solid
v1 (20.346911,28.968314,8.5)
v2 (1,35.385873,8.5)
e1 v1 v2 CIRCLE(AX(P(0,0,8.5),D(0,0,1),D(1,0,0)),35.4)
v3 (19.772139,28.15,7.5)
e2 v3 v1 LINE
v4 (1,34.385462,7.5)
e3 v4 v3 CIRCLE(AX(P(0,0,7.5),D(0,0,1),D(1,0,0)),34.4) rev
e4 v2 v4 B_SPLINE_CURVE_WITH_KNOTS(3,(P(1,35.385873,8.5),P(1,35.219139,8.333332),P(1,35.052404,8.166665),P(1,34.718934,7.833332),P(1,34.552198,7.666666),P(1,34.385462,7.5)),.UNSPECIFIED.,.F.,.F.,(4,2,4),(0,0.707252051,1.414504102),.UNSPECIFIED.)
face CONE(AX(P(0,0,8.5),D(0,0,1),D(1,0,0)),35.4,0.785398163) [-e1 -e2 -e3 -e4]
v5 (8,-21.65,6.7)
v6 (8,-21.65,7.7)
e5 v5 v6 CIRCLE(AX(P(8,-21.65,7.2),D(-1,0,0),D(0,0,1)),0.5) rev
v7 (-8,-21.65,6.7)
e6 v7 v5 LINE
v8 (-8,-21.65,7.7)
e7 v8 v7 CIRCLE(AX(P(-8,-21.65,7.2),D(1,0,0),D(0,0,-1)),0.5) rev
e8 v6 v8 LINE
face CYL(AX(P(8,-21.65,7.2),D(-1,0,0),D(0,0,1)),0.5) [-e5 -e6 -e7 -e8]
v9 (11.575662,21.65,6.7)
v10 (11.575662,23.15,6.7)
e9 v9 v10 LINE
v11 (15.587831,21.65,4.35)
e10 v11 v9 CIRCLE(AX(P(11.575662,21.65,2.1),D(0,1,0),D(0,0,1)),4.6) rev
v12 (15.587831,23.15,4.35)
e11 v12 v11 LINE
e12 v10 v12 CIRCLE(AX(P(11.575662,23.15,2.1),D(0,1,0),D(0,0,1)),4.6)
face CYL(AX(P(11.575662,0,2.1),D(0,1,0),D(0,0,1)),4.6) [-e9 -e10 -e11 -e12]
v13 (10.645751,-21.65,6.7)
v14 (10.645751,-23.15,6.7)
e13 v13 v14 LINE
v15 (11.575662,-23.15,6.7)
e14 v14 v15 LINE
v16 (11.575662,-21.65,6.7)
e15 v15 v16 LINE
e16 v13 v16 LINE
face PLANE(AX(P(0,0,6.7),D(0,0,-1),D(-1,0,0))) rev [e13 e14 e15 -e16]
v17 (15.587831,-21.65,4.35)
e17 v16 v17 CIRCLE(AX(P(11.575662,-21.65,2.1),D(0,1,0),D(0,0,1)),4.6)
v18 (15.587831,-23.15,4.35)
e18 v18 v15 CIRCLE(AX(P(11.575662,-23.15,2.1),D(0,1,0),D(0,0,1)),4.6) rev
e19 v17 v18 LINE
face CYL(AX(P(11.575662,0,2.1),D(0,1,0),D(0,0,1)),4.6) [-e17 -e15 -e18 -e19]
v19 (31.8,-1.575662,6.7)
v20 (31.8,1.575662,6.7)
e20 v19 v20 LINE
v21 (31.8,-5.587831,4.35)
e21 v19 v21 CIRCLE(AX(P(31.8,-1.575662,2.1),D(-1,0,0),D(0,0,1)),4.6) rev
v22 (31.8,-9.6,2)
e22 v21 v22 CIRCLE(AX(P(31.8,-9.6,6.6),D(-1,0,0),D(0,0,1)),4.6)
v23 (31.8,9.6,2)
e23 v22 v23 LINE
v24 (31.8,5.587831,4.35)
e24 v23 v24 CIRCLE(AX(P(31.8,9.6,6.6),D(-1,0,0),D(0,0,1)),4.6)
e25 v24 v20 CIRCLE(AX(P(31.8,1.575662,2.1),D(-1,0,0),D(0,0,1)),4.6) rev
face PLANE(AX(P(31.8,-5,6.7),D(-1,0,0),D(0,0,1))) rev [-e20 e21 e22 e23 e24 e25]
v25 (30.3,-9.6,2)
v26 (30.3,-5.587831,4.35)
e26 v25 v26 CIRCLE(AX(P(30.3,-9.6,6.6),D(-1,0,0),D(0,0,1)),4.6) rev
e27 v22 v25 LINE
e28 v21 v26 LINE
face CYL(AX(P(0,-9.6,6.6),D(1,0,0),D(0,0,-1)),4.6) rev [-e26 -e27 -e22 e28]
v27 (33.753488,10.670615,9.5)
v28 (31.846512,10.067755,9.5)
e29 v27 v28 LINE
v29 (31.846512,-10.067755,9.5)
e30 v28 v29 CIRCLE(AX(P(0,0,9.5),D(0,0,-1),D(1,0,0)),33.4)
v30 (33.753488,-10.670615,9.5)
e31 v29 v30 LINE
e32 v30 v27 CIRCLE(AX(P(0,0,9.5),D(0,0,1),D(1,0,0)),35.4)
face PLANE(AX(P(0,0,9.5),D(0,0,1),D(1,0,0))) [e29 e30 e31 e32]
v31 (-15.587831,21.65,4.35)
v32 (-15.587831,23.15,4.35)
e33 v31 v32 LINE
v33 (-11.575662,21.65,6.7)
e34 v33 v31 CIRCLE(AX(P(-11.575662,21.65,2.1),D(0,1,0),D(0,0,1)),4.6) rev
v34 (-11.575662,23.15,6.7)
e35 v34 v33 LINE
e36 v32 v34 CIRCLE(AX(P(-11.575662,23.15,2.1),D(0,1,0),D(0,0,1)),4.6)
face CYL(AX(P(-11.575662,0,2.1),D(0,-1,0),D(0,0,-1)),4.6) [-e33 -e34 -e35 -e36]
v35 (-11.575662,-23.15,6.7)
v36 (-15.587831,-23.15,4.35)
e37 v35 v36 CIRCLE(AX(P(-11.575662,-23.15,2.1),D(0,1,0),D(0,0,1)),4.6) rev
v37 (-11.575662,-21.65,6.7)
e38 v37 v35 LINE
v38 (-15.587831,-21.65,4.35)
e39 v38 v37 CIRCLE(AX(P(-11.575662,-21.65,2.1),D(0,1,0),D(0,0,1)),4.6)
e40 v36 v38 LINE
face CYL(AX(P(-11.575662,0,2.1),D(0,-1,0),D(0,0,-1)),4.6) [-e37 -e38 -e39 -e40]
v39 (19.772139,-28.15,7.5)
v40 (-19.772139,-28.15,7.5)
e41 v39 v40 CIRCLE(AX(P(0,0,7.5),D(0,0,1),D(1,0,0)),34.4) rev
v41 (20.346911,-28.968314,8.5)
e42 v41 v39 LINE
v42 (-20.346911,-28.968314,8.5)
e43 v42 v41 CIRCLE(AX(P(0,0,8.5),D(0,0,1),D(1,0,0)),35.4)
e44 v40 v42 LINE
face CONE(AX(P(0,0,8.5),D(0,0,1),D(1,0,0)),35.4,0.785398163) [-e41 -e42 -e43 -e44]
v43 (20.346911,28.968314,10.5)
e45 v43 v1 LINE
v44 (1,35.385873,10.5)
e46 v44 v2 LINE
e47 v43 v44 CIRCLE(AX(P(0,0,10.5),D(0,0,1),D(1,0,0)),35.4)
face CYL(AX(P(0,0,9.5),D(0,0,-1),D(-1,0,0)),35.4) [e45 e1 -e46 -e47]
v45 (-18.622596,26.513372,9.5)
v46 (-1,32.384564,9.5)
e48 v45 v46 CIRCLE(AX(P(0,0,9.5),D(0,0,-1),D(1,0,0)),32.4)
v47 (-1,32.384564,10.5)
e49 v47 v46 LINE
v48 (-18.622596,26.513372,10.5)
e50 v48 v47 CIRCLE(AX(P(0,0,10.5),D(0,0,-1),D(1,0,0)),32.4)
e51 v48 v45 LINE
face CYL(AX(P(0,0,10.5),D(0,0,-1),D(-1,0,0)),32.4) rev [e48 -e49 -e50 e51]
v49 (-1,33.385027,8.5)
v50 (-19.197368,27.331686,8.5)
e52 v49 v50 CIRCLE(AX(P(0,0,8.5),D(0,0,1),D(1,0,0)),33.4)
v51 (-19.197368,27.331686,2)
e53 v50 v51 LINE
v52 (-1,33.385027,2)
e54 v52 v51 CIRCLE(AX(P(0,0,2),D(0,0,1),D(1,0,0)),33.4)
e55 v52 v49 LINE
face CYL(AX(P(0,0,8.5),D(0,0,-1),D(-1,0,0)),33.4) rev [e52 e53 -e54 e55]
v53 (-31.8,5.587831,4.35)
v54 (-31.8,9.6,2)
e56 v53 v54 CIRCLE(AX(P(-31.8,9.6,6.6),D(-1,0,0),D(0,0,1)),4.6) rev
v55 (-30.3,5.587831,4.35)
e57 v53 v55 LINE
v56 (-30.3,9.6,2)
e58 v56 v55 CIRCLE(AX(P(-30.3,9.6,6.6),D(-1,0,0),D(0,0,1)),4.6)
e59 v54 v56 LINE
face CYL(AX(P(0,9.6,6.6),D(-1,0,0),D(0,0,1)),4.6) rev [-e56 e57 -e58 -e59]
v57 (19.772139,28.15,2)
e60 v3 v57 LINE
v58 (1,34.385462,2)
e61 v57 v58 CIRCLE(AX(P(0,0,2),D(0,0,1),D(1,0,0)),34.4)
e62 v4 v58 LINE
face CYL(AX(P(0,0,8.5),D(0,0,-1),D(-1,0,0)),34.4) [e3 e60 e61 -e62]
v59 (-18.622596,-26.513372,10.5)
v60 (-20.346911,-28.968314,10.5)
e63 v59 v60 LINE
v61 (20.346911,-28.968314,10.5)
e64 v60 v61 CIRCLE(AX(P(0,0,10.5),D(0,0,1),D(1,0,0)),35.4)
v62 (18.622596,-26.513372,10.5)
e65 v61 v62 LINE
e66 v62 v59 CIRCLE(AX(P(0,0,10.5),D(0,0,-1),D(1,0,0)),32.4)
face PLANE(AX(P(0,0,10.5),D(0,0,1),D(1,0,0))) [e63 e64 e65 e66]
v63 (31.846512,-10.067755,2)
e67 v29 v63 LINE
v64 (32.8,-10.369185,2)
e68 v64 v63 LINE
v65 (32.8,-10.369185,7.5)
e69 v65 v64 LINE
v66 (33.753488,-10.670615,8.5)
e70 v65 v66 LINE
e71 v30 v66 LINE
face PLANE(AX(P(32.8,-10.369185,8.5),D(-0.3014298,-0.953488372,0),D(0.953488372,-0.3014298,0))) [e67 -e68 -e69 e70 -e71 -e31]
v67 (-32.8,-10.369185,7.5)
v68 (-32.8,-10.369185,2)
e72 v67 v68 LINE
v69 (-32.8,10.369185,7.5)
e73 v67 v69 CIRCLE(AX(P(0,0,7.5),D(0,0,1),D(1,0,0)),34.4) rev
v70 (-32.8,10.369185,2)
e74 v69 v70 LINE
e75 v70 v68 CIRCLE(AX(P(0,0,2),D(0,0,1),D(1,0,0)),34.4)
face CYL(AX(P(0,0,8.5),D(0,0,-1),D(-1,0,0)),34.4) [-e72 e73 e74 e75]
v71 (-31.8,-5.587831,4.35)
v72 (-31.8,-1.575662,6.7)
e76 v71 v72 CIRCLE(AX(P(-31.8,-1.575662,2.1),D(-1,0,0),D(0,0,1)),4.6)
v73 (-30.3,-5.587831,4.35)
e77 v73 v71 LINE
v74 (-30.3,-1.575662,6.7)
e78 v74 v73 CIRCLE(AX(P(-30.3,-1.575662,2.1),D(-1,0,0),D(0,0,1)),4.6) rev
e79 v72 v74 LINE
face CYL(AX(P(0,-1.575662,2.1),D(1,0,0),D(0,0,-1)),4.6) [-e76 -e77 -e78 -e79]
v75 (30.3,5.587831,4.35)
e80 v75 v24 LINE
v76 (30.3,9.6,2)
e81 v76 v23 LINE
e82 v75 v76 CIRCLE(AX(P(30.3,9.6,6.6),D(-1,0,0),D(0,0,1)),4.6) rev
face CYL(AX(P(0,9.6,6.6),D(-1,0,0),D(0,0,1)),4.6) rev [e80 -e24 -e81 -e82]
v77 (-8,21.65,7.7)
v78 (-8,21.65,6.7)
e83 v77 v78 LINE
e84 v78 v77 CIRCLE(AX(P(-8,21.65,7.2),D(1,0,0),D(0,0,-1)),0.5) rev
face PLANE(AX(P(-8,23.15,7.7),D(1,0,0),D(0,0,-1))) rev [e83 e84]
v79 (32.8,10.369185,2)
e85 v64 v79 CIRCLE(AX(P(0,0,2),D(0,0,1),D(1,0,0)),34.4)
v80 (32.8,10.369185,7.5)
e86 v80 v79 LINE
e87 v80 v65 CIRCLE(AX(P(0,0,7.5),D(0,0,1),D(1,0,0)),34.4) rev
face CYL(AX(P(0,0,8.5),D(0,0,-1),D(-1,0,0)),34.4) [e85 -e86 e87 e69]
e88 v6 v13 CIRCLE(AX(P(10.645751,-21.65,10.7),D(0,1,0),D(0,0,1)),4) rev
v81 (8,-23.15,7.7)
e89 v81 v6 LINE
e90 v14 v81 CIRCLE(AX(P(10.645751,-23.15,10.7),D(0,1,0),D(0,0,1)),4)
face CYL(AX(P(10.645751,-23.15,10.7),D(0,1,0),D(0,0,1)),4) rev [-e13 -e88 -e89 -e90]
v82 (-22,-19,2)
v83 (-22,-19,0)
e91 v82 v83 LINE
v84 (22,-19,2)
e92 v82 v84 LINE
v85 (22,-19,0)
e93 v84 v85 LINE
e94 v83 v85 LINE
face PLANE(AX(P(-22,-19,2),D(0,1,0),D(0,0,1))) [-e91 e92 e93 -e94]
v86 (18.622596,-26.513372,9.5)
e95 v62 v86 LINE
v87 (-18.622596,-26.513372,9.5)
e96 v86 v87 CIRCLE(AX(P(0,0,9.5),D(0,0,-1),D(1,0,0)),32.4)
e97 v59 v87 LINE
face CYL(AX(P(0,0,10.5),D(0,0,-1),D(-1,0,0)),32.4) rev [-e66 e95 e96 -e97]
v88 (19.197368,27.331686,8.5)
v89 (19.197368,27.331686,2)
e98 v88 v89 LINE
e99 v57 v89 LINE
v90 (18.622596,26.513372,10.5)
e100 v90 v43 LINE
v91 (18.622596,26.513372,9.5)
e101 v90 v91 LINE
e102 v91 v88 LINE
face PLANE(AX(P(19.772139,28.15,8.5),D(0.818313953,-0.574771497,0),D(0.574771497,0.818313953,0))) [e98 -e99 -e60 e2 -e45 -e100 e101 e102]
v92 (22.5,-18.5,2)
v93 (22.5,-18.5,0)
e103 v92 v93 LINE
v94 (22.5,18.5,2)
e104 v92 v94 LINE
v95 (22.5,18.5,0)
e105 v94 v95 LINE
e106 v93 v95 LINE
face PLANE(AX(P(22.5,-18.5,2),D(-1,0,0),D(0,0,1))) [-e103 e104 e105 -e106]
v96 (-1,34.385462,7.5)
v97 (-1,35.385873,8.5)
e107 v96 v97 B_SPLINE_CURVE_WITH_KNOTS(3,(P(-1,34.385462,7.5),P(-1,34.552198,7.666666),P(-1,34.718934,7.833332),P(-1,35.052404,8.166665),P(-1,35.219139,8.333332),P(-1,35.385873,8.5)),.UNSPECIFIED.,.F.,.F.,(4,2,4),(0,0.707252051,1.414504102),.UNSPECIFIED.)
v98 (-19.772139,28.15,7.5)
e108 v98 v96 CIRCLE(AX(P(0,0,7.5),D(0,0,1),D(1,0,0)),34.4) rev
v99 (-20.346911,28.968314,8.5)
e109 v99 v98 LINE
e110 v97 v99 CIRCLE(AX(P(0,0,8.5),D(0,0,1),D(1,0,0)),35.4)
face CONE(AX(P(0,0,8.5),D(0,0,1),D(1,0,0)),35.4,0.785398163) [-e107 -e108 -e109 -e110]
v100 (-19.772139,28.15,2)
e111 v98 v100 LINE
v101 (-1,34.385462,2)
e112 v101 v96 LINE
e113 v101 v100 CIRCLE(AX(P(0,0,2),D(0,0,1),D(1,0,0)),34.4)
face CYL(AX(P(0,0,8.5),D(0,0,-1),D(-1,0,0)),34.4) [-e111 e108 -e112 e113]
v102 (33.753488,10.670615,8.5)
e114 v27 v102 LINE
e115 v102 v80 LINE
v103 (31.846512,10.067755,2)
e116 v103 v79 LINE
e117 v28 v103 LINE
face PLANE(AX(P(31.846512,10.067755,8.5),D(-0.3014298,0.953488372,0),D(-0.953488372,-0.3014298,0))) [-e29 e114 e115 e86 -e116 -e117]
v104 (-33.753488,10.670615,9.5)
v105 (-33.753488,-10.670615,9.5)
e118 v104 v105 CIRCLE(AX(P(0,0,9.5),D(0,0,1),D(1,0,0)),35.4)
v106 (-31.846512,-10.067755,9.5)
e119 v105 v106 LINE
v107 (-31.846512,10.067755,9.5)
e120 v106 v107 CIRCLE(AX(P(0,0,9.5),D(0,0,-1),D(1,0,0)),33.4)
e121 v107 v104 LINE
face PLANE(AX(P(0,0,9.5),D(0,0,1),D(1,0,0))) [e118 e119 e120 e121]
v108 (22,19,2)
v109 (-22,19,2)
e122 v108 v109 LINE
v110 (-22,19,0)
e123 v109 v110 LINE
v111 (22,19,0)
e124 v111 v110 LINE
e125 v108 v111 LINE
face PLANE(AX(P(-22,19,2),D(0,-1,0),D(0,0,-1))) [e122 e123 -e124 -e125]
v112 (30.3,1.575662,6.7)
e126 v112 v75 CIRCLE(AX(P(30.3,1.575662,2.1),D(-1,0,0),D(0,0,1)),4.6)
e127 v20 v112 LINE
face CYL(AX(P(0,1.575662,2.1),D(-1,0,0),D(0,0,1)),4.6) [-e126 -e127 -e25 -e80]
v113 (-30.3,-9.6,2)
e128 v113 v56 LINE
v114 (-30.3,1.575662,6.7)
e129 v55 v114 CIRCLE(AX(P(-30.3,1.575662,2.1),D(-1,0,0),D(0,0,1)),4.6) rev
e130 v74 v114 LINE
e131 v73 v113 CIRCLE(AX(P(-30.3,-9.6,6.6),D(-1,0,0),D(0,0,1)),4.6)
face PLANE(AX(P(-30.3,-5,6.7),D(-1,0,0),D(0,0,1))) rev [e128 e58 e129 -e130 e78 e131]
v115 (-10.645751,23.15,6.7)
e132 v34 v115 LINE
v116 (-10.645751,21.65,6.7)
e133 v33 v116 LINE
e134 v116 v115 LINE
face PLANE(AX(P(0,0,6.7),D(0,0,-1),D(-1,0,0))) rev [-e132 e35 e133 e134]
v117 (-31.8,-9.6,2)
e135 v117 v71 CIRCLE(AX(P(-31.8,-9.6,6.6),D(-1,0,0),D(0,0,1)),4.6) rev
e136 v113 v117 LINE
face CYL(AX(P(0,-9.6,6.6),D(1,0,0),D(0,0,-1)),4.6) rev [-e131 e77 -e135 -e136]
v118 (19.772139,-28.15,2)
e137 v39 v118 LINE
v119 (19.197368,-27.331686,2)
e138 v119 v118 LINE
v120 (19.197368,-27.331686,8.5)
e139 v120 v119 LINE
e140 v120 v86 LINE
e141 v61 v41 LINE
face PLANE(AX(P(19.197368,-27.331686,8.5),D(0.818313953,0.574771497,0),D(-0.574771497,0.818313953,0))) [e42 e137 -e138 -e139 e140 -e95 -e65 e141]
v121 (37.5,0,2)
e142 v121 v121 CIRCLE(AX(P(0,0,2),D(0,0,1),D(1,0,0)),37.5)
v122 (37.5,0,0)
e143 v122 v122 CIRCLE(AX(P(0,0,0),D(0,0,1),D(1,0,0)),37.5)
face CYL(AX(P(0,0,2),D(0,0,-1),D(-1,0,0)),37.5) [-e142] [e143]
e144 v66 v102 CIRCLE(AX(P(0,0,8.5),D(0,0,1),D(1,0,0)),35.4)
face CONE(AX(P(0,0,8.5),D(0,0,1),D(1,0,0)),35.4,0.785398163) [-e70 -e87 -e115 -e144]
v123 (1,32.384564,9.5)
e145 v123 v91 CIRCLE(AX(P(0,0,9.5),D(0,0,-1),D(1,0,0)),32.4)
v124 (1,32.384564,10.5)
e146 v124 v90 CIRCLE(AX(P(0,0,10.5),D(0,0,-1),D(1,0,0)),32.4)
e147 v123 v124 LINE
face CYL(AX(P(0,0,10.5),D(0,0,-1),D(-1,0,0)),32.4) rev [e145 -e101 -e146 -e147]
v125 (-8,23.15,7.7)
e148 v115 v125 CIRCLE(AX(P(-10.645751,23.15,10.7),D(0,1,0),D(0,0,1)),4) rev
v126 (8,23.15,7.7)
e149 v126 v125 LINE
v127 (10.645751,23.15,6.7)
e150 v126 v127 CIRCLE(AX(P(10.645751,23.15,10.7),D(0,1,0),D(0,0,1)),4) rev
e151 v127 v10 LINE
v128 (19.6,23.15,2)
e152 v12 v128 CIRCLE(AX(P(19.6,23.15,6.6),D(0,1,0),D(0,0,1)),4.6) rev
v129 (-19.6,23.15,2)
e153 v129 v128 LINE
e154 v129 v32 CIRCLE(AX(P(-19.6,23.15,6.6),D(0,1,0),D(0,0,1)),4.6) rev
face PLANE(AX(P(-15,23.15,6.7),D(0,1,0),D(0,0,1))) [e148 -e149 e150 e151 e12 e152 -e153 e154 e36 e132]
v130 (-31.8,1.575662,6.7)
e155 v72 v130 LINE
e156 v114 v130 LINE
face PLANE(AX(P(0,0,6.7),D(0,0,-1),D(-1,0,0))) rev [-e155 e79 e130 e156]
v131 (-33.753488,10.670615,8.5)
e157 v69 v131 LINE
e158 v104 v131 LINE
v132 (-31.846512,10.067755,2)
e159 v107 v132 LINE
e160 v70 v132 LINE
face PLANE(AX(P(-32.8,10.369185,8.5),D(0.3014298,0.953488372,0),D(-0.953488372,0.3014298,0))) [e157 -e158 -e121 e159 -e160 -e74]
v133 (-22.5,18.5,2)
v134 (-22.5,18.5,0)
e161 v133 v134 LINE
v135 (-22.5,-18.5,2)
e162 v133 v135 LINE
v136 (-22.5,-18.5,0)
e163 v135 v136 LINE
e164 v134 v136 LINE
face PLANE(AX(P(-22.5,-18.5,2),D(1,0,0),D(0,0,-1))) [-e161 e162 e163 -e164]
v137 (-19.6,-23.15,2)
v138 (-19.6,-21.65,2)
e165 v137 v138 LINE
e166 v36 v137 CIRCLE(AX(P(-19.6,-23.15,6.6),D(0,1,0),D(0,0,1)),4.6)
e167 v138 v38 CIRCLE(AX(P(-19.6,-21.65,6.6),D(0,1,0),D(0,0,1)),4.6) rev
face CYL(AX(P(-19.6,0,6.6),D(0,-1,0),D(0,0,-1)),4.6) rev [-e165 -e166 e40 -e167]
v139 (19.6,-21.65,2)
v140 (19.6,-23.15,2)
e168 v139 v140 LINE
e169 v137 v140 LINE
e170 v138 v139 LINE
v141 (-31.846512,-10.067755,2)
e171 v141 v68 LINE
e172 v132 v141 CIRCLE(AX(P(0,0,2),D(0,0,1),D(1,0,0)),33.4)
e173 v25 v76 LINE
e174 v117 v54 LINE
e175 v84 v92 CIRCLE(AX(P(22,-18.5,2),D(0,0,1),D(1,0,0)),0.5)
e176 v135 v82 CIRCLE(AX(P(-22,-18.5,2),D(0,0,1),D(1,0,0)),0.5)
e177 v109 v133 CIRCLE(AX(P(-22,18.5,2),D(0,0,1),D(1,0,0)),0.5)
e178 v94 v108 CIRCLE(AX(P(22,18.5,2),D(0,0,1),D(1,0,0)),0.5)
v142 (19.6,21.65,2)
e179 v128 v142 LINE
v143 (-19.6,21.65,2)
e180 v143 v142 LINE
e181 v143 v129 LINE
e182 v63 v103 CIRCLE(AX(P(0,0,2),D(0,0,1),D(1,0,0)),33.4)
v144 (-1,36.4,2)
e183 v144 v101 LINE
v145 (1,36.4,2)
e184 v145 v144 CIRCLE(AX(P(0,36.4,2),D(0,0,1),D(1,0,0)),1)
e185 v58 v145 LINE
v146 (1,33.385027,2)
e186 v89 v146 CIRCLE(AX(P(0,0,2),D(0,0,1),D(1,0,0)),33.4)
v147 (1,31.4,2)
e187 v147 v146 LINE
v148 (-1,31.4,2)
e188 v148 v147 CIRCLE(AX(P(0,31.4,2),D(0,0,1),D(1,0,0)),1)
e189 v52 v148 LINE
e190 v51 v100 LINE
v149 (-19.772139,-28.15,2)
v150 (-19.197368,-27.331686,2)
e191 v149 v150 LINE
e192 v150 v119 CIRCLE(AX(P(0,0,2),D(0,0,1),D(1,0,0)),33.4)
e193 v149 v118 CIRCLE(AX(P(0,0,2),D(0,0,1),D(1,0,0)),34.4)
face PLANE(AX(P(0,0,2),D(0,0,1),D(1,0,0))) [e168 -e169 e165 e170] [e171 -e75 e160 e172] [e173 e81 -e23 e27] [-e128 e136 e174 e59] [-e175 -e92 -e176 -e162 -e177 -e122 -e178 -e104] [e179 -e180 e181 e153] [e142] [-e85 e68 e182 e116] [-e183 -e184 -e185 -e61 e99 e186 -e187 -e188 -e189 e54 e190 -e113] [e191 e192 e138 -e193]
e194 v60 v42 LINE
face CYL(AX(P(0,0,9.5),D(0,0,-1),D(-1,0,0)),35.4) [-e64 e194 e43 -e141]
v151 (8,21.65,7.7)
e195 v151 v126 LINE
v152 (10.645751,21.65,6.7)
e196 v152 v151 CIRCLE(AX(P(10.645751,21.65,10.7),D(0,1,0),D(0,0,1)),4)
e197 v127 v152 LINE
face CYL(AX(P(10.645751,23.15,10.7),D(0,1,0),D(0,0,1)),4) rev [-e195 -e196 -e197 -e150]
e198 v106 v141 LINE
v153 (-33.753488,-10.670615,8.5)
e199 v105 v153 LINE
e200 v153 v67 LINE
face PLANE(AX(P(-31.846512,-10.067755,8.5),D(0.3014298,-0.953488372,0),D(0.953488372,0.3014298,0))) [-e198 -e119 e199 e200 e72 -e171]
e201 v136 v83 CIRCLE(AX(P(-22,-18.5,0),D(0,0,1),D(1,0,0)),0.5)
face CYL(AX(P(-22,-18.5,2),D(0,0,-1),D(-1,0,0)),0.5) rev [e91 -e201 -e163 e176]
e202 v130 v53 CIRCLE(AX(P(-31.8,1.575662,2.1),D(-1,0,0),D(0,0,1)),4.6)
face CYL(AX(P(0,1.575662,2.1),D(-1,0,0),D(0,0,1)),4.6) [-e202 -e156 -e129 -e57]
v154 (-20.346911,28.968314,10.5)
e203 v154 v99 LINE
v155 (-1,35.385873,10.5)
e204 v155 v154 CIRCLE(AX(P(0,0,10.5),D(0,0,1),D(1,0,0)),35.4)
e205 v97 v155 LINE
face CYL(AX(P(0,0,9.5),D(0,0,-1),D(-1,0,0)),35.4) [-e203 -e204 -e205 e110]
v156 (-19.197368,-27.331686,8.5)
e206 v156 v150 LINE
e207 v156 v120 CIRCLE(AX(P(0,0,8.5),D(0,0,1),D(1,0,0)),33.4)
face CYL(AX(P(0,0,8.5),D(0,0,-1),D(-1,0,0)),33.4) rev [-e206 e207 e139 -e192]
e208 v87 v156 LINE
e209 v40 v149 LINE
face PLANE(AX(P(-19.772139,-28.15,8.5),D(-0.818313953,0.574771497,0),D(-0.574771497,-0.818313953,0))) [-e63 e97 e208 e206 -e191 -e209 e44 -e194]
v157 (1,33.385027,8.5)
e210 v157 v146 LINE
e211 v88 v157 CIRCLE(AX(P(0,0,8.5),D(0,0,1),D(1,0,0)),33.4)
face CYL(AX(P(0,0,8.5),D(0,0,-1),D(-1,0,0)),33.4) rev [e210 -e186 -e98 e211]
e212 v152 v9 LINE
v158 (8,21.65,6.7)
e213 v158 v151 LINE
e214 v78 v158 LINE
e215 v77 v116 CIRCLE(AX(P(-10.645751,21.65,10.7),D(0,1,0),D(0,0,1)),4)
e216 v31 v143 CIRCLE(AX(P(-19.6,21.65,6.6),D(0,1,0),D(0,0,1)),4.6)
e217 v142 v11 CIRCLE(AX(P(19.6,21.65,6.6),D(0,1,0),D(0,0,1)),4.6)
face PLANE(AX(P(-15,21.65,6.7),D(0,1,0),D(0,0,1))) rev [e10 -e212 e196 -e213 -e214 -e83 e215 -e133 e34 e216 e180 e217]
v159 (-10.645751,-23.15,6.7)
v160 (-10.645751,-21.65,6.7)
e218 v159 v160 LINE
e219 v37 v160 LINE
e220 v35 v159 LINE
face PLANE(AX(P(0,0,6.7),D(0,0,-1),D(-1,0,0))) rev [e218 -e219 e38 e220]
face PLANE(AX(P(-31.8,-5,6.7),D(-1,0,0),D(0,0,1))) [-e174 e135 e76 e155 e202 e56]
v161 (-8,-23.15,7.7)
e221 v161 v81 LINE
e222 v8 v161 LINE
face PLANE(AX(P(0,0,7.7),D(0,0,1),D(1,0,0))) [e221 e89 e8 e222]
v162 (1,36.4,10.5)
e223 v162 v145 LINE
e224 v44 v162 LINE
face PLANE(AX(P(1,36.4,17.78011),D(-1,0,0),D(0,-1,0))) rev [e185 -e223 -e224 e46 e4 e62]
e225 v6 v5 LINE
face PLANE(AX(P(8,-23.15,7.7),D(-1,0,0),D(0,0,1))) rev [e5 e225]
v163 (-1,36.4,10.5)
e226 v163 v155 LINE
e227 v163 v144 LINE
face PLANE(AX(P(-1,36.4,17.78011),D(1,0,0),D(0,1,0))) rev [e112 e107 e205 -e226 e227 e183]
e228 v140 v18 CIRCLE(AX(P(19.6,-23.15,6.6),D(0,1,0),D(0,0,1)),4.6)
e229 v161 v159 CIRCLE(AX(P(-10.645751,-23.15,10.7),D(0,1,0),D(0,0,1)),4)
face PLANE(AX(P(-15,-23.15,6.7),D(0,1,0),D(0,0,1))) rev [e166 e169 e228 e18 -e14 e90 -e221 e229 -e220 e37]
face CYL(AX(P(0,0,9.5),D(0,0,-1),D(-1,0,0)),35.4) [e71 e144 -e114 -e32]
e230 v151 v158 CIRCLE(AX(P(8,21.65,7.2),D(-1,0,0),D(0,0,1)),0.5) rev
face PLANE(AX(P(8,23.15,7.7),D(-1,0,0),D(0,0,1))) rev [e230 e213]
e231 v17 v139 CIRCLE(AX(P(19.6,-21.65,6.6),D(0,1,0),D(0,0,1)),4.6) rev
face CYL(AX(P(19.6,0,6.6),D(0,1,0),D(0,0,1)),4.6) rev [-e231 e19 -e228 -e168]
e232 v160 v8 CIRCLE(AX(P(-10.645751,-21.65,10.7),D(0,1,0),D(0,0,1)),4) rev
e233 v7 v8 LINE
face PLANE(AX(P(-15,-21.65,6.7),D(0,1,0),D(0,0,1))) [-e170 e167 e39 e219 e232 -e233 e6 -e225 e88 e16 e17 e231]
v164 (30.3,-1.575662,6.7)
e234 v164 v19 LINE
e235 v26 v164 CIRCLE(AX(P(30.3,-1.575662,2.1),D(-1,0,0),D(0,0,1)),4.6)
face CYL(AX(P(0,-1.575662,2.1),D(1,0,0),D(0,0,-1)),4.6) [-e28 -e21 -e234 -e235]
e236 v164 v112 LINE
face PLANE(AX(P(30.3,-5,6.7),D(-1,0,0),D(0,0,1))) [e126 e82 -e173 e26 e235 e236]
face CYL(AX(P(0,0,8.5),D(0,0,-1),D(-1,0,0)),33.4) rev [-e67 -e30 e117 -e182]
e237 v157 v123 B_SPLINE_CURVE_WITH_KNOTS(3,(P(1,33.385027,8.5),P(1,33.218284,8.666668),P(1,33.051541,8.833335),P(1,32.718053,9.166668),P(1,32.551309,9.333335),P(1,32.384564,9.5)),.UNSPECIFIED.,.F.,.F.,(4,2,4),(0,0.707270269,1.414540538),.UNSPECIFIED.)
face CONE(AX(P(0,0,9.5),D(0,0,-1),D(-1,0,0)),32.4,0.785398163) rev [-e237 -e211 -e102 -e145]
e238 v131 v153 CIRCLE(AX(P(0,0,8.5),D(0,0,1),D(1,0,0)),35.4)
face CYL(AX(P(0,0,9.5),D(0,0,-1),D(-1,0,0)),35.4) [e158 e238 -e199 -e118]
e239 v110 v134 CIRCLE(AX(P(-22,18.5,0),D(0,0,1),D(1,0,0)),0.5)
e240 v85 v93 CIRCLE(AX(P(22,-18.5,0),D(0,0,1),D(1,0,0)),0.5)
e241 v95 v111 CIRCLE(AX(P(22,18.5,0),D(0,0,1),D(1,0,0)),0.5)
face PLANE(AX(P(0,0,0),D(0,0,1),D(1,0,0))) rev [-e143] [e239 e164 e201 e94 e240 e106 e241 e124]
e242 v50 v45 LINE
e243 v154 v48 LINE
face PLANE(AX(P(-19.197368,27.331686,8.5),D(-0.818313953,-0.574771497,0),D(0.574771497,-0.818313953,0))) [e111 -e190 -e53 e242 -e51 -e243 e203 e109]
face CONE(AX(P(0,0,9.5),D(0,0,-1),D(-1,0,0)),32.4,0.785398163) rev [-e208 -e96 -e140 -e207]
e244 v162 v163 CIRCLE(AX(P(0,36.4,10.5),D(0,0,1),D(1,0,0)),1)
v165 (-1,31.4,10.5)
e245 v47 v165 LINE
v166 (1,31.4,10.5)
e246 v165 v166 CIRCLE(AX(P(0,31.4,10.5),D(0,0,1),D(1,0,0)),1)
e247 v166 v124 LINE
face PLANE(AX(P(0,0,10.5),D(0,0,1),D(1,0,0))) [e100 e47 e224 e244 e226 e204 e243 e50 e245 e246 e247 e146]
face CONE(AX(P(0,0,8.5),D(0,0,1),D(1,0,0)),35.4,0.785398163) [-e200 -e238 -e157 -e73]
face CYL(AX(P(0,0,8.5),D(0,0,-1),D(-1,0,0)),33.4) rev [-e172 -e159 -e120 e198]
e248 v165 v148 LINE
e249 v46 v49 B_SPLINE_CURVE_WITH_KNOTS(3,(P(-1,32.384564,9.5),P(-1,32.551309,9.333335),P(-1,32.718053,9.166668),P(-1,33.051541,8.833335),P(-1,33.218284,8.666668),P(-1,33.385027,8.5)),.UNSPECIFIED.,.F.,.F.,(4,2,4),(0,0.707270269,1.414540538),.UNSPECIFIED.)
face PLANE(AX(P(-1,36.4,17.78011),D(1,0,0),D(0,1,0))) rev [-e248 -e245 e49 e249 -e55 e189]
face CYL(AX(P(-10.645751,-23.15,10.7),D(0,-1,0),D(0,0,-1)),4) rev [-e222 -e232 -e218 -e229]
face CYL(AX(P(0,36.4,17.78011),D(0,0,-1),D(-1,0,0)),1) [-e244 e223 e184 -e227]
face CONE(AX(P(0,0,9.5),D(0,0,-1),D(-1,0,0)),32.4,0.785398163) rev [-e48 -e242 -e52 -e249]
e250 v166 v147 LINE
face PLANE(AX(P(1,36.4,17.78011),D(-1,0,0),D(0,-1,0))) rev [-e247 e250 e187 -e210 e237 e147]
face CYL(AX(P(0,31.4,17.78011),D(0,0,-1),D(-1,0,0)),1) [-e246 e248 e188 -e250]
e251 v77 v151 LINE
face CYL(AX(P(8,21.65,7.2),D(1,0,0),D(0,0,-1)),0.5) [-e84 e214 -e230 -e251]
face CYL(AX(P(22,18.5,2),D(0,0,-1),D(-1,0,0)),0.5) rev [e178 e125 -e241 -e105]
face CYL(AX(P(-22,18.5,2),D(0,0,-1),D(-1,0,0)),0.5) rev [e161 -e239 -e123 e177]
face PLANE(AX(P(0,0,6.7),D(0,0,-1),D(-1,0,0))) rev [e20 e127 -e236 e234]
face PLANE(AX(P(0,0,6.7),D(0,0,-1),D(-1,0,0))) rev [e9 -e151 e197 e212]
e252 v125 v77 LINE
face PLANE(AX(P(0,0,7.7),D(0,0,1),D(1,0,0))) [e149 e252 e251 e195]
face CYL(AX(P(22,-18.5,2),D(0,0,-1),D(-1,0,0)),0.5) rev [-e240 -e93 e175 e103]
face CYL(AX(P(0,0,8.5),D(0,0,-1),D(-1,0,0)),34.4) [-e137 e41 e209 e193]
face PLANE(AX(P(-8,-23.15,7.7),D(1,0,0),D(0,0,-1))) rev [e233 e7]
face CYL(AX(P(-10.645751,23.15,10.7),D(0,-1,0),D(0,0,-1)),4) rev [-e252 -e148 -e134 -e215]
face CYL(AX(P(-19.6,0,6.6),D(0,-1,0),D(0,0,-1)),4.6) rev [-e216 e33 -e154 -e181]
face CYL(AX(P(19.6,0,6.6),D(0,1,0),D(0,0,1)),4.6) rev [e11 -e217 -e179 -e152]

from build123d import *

# Parameters (mm, degrees)
ESQUISSE1_R        = 37.50000000000001
BOSS_EXTRU_1_DEPTH = 2
ESQUISSE2_W        = 30.000000000000004
ESQUISSE2_H        = 1.4999999999999964
ESQUISSE2_W_2      = 1.5
ESQUISSE2_H_2      = 10
EXTRU_MINCE1_DEPTH = 4.7
ESQUISSE5_W        = 16
ESQUISSE5_H        = 2.0000000000000036
BOSS_EXTRU_3_DEPTH = 1
CONG_5_R           = 0.5
CONG_6_R           = 0.5
CONG_1_R           = 4.6
CONG_2_R           = 4.6
EXTRU_MINCE2_DEPTH = 6.5
BOSS_EXTRU_2_DEPTH = 1
BOSS_EXTRU_5_DEPTH = 1
BOSS_EXTRU_4_DEPTH = 8.5
CHANFREIN1_SIZE    = 1
CONG_7_R           = 4


# Some blends are built 0.0001 mm under size
with BuildPart() as part:
    # Esquisse1 → Boss.-Extru.1 (new body)
    with BuildSketch(Plane.XY):
        Circle(ESQUISSE1_R)
        with BuildLine():
            Line((-21.999999999999996, -18.999999999999996), (22.000000000000004, -18.999999999999996))
            ThreePointArc((22.000000000000004, -18.999999999999996), (22.353553390593277, -18.85355339059327), (22.500000000000004, -18.499999999999996))
            Line((22.500000000000004, -18.499999999999996), (22.500000000000004, 18.500000000000004))
            ThreePointArc((22.500000000000004, 18.500000000000004), (22.353553390593277, 18.853553390593277), (22.000000000000004, 19.000000000000004))
            Line((22.000000000000004, 19.000000000000004), (-21.999999999999996, 19.000000000000004))
            ThreePointArc((-21.999999999999996, 19.000000000000004), (-22.35355339059327, 18.853553390593277), (-22.499999999999996, 18.500000000000004))
            Line((-22.499999999999996, 18.500000000000004), (-22.499999999999996, -18.499999999999996))
            ThreePointArc((-22.499999999999996, -18.499999999999996), (-22.35355339059327, -18.85355339059327), (-21.999999999999996, -18.999999999999996))
        make_face(mode=Mode.SUBTRACT)
    extrude(amount=BOSS_EXTRU_1_DEPTH)

    # Esquisse2 → Extru.-Mince1 (add)
    with BuildSketch(Plane.XY.offset(2)):
        with Locations((0, 22.4)):
            Rectangle(ESQUISSE2_W, ESQUISSE2_H)
        with Locations((31.05, 0)):
            Rectangle(ESQUISSE2_W_2, ESQUISSE2_H_2)
        with Locations((-31.05, 0)):
            Rectangle(ESQUISSE2_W_2, ESQUISSE2_H_2)
        with Locations((0, -22.4)):
            Rectangle(ESQUISSE2_W, ESQUISSE2_H)
    extrude(amount=EXTRU_MINCE1_DEPTH)

    # Esquisse5 → Boss.-Extru.3 (add)
    with BuildSketch(Plane.XY.offset(6.7)):
        with Locations((0, 22.15)):
            Rectangle(ESQUISSE5_W, ESQUISSE5_H)
        with Locations((0, -22.15)):
            Rectangle(ESQUISSE5_W, ESQUISSE5_H)
    extrude(amount=BOSS_EXTRU_3_DEPTH)

    # Congé5
    # the kernel refuses this fillet: 0.5 mm, written as the material it takes off along each edge
    with BuildSketch(Plane(origin=(9.25, 21.15, 6.7), x_dir=(0, 1, 0), z_dir=(-1, 0, 0))) as cong_5_piece_1:
        with BuildLine():
            CenterArc((CONG_5_R, -CONG_5_R), CONG_5_R, 90, 90)
            Line((0, -CONG_5_R), (0, 0))
            Line((0, 0), (CONG_5_R, 0))
        make_face()
    extrude(amount=18.5, mode=Mode.SUBTRACT)
    with BuildSketch(Plane(origin=(9.25, 21.15, 7.7), x_dir=(0, 0, -1), z_dir=(-1, 0, 0))) as cong_5_piece_2:
        with BuildLine():
            CenterArc((CONG_5_R, -CONG_5_R), CONG_5_R, 90, 90)
            Line((0, -CONG_5_R), (0, 0))
            Line((0, 0), (CONG_5_R, 0))
        make_face()
    extrude(amount=18.5, mode=Mode.SUBTRACT)

    # Congé6
    # the kernel refuses this fillet: 0.5 mm, written as the material it takes off along each edge
    with BuildSketch(Plane(origin=(9.25, -21.15, 6.7), x_dir=(0, -1, 0), z_dir=(-1, 0, 0))) as cong_6_piece_1:
        with BuildLine():
            CenterArc((CONG_6_R, CONG_6_R), CONG_6_R, 180, 90)
            Line((0, CONG_6_R), (0, 0))
            Line((0, 0), (CONG_6_R, 0))
        make_face()
    extrude(amount=18.5, mode=Mode.SUBTRACT)
    with BuildSketch(Plane(origin=(9.25, -21.15, 7.7), x_dir=(0, -1, 0), z_dir=(-1, 0, 0))) as cong_6_piece_2:
        with BuildLine():
            CenterArc((CONG_6_R, -CONG_6_R), CONG_6_R, 90, 90)
            Line((0, -CONG_6_R), (0, 0))
            Line((0, 0), (CONG_6_R, 0))
        make_face()
    extrude(amount=18.5, mode=Mode.SUBTRACT)

    # Congé1
    cong_1_edges = [part.edges().sort_by_distance(p)[0] for p in [
        (-15, 22.4, 2),
        (15, 22.4, 2),
        (31.05, -5, 2),
        (31.05, 5, 2),
        (-31.05, -5, 2),
        (-31.05, 5, 2),
        (-15, -22.4, 2),
        (15, -22.4, 2),
    ]]
    fillet(cong_1_edges, radius=CONG_1_R)

    # Congé2
    cong_2_edges = [part.edges().sort_by_distance(p)[0] for p in [
        (15, 22.4, 6.7),
        (31.05, 5, 6.7),
        (31.05, -5, 6.7),
        (15, -22.4, 6.7),
        (-15, -22.4, 6.7),
        (-31.05, 5, 6.7),
        (-31.05, -5, 6.7),
        (-15, 22.4, 6.7),
    ]]
    fillet(cong_2_edges, radius=CONG_2_R)

    # Esquisse3 → Extru.-Mince2 (add)
    with BuildSketch(Plane.XY.offset(2)):
        with BuildLine():
            ThreePointArc((-32.80000000000001, 10.369185117452545), (-34.4, 4.21e-15), (-32.80000000000001, -10.369185117452545))
            Line((-32.80000000000001, -10.369185117452545), (-31.84651162790699, -10.0677553175266))
            ThreePointArc((-31.84651162790699, -10.0677553175266), (-33.4, -4.09e-15), (-31.84651162790699, 10.0677553175266))
            Line((-31.84651162790699, 10.0677553175266), (-32.80000000000001, 10.369185117452545))
        make_face()
        with BuildLine():
            ThreePointArc((-19.772139489696098, -28.150000000000002), (2.11e-15, -34.4), (19.772139489696098, -28.150000000000002))
            Line((19.772139489696098, -28.150000000000002), (19.197367992902606, -27.33168604651163))
            ThreePointArc((19.197367992902606, -27.33168604651163), (2.05e-15, -33.4), (-19.197367992902606, -27.33168604651163))
            Line((-19.197367992902606, -27.33168604651163), (-19.772139489696098, -28.150000000000002))
        make_face()
        with BuildLine():
            ThreePointArc((32.80000000000001, -10.369185117452545), (34.4, 0), (32.80000000000001, 10.369185117452545))
            Line((32.80000000000001, 10.369185117452545), (31.84651162790699, 10.0677553175266))
            ThreePointArc((31.84651162790699, 10.0677553175266), (33.4, 0), (31.84651162790699, -10.0677553175266))
            Line((31.84651162790699, -10.0677553175266), (32.80000000000001, -10.369185117452545))
        make_face()
        with BuildLine():
            ThreePointArc((19.772139489696105, 28.15), (2.11e-15, 34.4), (-19.772139489696105, 28.15))
            Line((-19.772139489696105, 28.15), (-19.197367992902613, 27.331686046511628))
            ThreePointArc((-19.197367992902613, 27.331686046511628), (-5.37e-15, 33.4), (19.197367992902613, 27.331686046511628))
            Line((19.197367992902613, 27.331686046511628), (19.772139489696105, 28.15))
        make_face()
    extrude(amount=EXTRU_MINCE2_DEPTH)

    # Esquisse4 → Boss.-Extru.2 (add)
    with BuildSketch(Plane.XY.offset(8.5)):
        with BuildLine():
            Line((-19.197367992902617, 27.331686046511624), (-20.3469109864896, 28.96831395348837))
            ThreePointArc((-20.3469109864896, 28.96831395348837), (-5.69e-15, 35.400000000000006), (20.346910986489593, 28.968313953488376))
            Line((20.346910986489593, 28.968313953488376), (19.19736799290261, 27.331686046511624))
            ThreePointArc((19.19736799290261, 27.331686046511624), (2.05e-15, 33.4), (-19.197367992902617, 27.331686046511624))
        make_face()
        with BuildLine():
            Line((33.75348837209304, 10.67061491737849), (31.84651162790699, 10.067755317526597))
            ThreePointArc((31.84651162790699, 10.067755317526597), (33.4, -3.71e-15), (31.846511627906985, -10.067755317526604))
            Line((31.846511627906985, -10.067755317526604), (33.753488372093045, -10.670614917378492))
            ThreePointArc((33.753488372093045, -10.670614917378492), (35.40000000000001, 0), (33.75348837209304, 10.67061491737849))
        make_face()
        with BuildLine():
            Line((19.197367992902603, -27.331686046511635), (20.346910986489593, -28.968313953488376))
            ThreePointArc((20.346910986489593, -28.968313953488376), (1.003e-14, -35.4), (-20.34691098648957, -28.96831395348839))
            Line((-20.34691098648957, -28.96831395348839), (-19.197367992902635, -27.33168604651161))
            ThreePointArc((-19.197367992902635, -27.33168604651161), (-2.762e-14, -33.4), (19.197367992902603, -27.331686046511635))
        make_face()
        with BuildLine():
            Line((-31.846511627906985, -10.067755317526593), (-33.75348837209304, -10.670614917378492))
            ThreePointArc((-33.75348837209304, -10.670614917378492), (-35.40000000000001, 4.34e-15), (-33.753488372093045, 10.67061491737849))
            Line((-33.753488372093045, 10.67061491737849), (-31.846511627906985, 10.067755317526604))
            ThreePointArc((-31.846511627906985, 10.067755317526604), (-33.4, 4.09e-15), (-31.846511627906985, -10.067755317526593))
        make_face()
    extrude(amount=BOSS_EXTRU_2_DEPTH)

    # Esquisse8 → Boss.-Extru.5 (add)
    with BuildSketch(Plane.XY.offset(9.500000000000002)):
        with BuildLine():
            Line((20.34691098648959, -28.96831395348837), (18.622596496109104, -26.513372093023264))
            ThreePointArc((18.622596496109104, -26.513372093023264), (-4.118e-14, -32.4), (-18.622596496109168, -26.513372093023218))
            Line((-18.622596496109168, -26.513372093023218), (-20.34691098648957, -28.96831395348839))
            ThreePointArc((-20.34691098648957, -28.96831395348839), (1.003e-14, -35.4), (20.34691098648959, -28.96831395348837))
        make_face()
        with BuildLine():
            Line((-20.346910986489604, 28.968313953488373), (-18.622596496109125, 26.51337209302325))
            ThreePointArc((-18.622596496109125, 26.51337209302325), (1.98e-15, 32.4), (18.622596496109125, 26.513372093023253))
            Line((18.622596496109125, 26.513372093023253), (20.346910986489593, 28.968313953488384))
            ThreePointArc((20.346910986489593, 28.968313953488384), (-1.355e-14, 35.40000000000001), (-20.346910986489604, 28.968313953488373))
        make_face()
    extrude(amount=BOSS_EXTRU_5_DEPTH)

    # Esquisse7 → Boss.-Extru.4 (add)
    with BuildSketch(Plane.XY.offset(2)):
        with BuildLine():
            Line((0.9999999999999993, 36.400000000000006), (1.0000000000000009, 31.400000000000006))
            ThreePointArc((1.0000000000000009, 31.400000000000006), (-1.8e-16, 30.400000000000006), (-0.9999999999999996, 31.400000000000006))
            Line((-0.9999999999999996, 31.400000000000006), (-1.000000000000001, 36.400000000000006))
            ThreePointArc((-1.000000000000001, 36.400000000000006), (-1.47e-15, 37.400000000000006), (0.9999999999999993, 36.400000000000006))
        make_face()
    extrude(amount=BOSS_EXTRU_4_DEPTH)

    # Chanfrein1
    chanfrein1_edges = [part.edges().sort_by_distance(p)[0] for p in [
        (10.843924173071517, 32.64612241183745, 8.5),
        (-3.55e-15, -34.39999999999999, 8.5),
        (34.400000000000006, 4e-15, 8.5),
        (-34.4, -8.9e-16, 8.5),
        (-10.542492654739178, 31.692520389277497, 9.5),
        (-1.776e-14, -33.39999999999999, 9.5),
        (10.542492654739181, 31.692520389277497, 9.5),
        (-10.843924173071517, 32.64612241183745, 8.5),
    ]]
    chamfer(chanfrein1_edges, length=CHANFREIN1_SIZE - 0.0001)  # a hair under: the kernel refuses the full size

    # Congé7
    # the kernel refuses this fillet: 4 mm, written as the material it adds along each edge
    with BuildSketch(Plane(origin=(8, -23.150000000000002, 6.7), x_dir=(1, 0, -3.4e-16), z_dir=(0, 1, 0)), Plane(origin=(-8, -21.65, 6.7), x_dir=(-1, 0, -3.4e-16), z_dir=(0, -1, 0))) as cong_7_piece_1:
        with BuildLine():
            CenterArc((2.645751311064592, -4), CONG_7_R, 89.99999999999999, 41.4096221092709)
            Line((-3.4e-16, -1.0000000000000009), (0, 0))
            Line((0, 0), (2.6457513110645934, 0))
        make_face()
    extrude(amount=1.5000000000000036)
    with BuildSketch(Plane(origin=(-8, 21.65, 6.7), x_dir=(0, 0, 1), z_dir=(0, 1, 0))) as cong_7_piece_2:
        with BuildLine():
            CenterArc((3.999999999999999, -2.6457513110645934), CONG_7_R, 138.5903778907291, 41.40962210927091)
            Line((-8.9e-16, -2.6457513110645934), (0, 0))
            Line((0, 0), (1.0000000000000009, 0))
        make_face()
    extrude(amount=1.5000000000000036)
    with BuildSketch(Plane(origin=(8, 23.150000000000002, 6.7), x_dir=(1, 0, -3.4e-16), z_dir=(0, -1, 0))) as cong_7_piece_3:
        with BuildLine():
            CenterArc((2.645751311064592, 4), CONG_7_R, 228.59037789072912, 41.40962210927091)
            Line((-3.4e-16, 1.0000000000000009), (0, 0))
            Line((0, 0), (2.6457513110645934, 0))
        make_face()
    extrude(amount=1.5000000000000036)


solid = part.part
